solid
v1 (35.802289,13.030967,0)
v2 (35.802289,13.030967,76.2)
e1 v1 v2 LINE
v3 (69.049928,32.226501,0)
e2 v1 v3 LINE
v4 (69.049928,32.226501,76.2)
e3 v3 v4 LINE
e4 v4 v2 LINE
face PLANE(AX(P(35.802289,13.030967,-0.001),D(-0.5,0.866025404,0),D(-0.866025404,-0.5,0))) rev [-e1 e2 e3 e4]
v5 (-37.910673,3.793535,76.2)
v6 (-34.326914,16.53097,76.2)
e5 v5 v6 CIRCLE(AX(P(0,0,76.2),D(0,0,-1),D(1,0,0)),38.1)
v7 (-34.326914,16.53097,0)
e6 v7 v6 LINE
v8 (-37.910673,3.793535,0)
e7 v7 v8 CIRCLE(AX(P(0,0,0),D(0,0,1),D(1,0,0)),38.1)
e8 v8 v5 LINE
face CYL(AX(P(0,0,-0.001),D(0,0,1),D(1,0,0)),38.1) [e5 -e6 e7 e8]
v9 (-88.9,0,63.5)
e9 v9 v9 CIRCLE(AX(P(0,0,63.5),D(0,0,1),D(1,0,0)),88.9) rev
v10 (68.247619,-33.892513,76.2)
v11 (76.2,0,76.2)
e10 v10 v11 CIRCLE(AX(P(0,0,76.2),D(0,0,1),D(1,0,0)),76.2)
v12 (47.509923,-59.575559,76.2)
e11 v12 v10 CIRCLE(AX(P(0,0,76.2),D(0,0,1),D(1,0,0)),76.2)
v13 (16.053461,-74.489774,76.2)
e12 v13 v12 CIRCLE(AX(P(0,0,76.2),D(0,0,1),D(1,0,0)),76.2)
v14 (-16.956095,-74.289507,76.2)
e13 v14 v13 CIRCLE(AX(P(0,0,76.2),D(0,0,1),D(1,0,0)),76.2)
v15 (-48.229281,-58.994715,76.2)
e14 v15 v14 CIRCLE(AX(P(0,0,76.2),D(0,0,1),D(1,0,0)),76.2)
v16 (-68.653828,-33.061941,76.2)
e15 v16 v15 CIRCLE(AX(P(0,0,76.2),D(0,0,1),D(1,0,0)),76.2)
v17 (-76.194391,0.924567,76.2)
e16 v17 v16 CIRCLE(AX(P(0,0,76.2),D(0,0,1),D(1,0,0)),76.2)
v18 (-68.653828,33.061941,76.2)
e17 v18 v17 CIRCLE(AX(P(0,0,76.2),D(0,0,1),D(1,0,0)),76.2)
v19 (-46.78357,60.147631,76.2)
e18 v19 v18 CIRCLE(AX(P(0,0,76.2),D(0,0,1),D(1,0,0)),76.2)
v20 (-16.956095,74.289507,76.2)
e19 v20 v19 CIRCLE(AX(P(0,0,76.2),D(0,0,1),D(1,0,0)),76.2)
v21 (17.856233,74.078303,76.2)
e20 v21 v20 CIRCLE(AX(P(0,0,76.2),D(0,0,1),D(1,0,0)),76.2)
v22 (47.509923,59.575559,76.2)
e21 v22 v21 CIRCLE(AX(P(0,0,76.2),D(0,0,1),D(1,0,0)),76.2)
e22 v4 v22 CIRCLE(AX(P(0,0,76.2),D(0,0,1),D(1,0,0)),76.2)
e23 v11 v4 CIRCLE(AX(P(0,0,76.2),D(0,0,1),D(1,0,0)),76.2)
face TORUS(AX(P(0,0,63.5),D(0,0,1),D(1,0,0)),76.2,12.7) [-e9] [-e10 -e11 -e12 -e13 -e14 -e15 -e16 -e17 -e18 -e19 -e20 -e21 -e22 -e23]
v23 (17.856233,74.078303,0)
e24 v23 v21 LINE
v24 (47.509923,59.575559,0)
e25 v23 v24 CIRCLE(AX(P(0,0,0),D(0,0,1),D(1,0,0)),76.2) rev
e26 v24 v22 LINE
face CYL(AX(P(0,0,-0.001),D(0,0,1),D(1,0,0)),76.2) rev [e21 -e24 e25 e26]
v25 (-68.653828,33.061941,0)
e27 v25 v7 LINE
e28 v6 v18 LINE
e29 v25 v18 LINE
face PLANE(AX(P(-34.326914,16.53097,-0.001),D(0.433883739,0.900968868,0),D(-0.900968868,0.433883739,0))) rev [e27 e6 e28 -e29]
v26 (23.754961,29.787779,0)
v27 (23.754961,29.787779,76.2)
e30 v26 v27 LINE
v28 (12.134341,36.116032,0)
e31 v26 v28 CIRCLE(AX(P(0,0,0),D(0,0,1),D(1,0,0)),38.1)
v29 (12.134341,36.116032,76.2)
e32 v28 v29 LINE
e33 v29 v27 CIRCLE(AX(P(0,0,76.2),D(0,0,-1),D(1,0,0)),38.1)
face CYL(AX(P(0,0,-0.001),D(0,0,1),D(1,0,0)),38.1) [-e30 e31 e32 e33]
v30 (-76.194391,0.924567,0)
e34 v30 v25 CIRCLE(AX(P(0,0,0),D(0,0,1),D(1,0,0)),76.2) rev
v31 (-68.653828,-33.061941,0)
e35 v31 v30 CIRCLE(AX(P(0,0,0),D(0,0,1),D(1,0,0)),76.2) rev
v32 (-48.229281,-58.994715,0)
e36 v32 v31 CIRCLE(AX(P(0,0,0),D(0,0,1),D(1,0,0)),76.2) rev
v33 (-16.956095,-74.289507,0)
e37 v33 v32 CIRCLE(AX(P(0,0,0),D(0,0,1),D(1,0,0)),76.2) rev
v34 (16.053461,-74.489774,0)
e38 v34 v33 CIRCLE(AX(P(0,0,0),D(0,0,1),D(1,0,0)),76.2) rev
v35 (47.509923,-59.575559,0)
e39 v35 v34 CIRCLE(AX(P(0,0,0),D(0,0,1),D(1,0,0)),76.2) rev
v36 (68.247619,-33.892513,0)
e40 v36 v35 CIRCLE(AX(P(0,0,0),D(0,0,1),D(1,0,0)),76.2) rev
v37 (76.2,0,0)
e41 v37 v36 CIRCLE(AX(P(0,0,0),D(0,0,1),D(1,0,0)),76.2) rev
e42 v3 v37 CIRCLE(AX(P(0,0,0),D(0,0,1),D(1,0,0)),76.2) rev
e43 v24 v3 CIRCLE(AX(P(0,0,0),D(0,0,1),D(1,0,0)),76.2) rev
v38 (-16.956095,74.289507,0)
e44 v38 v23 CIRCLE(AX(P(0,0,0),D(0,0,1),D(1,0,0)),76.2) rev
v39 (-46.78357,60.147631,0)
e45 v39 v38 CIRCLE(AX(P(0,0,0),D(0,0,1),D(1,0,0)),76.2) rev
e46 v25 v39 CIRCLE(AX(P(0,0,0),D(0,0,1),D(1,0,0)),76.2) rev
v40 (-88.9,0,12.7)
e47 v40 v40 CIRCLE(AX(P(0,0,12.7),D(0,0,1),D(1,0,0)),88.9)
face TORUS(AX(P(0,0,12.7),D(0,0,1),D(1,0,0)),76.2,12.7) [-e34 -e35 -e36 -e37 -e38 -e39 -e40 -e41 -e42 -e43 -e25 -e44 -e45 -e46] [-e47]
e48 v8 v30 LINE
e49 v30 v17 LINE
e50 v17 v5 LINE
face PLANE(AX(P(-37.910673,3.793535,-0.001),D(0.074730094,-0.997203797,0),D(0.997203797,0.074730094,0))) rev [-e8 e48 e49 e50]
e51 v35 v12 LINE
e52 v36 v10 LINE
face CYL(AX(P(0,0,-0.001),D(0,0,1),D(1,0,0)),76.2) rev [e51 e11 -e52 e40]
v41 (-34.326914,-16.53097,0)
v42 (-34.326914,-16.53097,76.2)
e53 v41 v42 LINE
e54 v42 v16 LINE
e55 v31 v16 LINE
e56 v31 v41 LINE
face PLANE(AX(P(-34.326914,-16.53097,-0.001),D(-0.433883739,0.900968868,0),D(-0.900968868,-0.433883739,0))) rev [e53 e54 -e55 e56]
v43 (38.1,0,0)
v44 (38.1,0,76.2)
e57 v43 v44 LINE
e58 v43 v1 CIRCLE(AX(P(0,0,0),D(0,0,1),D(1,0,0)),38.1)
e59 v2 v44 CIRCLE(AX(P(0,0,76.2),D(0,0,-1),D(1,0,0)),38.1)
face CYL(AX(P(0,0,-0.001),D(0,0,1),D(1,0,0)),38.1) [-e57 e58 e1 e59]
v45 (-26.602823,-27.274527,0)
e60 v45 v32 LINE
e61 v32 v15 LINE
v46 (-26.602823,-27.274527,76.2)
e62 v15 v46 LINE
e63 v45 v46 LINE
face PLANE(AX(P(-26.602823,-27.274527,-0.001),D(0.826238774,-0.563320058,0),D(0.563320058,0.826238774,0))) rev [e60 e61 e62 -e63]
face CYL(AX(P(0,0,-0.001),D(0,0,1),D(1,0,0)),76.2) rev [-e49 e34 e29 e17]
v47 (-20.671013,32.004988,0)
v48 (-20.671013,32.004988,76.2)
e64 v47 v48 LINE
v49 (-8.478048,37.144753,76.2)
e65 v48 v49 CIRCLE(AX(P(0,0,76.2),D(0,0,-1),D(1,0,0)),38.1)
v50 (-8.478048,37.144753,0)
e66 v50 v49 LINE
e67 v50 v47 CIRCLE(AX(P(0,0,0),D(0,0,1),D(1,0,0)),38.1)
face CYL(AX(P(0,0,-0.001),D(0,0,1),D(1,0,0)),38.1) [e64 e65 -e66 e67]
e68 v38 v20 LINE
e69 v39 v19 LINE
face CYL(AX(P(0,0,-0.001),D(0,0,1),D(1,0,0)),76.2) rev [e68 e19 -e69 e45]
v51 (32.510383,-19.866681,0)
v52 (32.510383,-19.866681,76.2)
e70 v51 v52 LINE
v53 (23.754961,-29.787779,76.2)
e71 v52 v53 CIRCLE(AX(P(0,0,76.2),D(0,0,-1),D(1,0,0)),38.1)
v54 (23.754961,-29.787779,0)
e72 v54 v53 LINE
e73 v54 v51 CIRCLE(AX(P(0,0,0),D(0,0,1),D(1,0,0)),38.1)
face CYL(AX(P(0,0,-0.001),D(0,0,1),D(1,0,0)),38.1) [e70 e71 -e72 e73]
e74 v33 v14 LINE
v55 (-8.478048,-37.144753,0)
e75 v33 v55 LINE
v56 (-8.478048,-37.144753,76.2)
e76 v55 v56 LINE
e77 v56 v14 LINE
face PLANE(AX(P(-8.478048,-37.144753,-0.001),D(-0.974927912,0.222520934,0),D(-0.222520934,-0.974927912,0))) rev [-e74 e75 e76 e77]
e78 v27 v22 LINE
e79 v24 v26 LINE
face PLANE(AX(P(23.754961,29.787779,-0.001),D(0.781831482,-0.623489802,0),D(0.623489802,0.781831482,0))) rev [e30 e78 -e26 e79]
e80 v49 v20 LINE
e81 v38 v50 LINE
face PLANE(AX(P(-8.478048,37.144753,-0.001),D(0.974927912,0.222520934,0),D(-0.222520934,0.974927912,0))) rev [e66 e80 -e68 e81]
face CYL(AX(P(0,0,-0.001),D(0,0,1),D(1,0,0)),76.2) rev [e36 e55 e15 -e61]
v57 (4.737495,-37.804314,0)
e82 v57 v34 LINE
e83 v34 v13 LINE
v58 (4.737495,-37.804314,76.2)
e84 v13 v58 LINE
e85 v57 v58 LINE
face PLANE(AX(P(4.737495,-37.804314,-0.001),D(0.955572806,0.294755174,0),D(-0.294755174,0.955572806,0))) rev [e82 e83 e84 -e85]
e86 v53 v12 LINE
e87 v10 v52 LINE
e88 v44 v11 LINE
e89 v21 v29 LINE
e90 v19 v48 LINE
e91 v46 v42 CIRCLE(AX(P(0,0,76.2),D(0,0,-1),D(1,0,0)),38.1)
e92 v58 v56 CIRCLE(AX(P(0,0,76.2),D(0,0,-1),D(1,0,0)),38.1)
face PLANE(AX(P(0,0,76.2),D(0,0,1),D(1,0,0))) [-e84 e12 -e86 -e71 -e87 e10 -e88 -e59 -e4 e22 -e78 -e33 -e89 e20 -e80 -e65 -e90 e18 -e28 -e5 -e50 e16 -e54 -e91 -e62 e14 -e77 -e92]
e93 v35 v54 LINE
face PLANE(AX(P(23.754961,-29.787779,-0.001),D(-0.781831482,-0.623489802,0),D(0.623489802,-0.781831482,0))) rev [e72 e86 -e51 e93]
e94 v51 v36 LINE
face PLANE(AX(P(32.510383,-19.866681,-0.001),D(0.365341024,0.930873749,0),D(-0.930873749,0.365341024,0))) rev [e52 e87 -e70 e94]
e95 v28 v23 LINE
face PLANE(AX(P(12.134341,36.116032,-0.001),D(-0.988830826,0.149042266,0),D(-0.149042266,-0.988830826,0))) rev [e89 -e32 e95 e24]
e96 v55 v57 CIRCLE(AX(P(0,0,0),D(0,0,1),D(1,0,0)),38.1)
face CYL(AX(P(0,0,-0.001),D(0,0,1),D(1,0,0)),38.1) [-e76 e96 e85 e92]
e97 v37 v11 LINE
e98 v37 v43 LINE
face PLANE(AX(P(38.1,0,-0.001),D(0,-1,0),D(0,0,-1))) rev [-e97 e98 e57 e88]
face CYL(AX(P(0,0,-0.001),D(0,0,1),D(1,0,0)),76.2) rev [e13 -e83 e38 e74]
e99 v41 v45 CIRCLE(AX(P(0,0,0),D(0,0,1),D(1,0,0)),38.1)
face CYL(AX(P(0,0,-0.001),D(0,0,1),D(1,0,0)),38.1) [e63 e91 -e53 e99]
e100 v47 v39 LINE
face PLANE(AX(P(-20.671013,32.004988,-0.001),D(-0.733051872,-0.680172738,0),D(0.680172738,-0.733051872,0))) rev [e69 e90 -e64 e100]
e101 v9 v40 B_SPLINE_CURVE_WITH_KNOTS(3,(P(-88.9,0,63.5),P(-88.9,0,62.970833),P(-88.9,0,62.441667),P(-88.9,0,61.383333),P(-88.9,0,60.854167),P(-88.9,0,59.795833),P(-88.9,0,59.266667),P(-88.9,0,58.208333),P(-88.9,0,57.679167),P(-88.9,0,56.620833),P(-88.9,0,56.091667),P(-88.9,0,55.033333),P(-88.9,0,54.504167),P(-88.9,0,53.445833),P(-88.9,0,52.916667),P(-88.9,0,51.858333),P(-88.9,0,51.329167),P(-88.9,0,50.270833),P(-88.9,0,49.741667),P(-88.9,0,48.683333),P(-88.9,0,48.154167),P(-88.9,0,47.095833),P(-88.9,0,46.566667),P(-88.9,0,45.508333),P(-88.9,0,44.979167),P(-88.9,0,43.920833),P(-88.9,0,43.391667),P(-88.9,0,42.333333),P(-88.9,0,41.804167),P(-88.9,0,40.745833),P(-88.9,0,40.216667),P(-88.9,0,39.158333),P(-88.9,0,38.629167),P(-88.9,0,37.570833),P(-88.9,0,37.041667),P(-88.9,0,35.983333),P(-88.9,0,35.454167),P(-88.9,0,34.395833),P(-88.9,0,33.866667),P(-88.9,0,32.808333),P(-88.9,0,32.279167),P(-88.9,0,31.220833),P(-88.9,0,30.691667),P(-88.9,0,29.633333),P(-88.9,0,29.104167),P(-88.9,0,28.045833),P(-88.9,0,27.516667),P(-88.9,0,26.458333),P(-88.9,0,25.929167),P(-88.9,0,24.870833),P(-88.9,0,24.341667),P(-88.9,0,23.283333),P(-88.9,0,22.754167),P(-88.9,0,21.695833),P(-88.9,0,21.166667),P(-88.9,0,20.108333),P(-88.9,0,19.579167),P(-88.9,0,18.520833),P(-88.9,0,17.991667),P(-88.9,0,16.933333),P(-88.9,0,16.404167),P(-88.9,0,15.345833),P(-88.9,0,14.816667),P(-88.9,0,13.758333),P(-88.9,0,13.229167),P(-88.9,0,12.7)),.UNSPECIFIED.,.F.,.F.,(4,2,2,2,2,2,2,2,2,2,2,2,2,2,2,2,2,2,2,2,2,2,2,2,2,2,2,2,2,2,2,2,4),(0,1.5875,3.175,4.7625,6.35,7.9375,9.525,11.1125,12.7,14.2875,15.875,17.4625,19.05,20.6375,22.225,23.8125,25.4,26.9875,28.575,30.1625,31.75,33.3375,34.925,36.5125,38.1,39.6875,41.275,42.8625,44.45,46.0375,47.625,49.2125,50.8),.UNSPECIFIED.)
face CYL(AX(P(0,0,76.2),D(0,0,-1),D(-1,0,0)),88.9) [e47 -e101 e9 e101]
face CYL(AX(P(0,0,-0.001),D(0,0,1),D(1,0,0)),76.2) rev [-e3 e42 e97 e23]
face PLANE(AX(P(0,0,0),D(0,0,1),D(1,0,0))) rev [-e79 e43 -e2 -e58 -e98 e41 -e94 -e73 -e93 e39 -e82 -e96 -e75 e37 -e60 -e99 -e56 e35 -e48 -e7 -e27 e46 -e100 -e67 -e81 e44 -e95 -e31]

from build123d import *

# Parameters (mm, degrees)
SKETCH1_R           = 88.9
BOSS_EXTRUDE1_DEPTH = 76.2
CUT_EXTRUDE1_REACH  = 149.013


with BuildPart() as part:
    # Sketch1 → Boss-Extrude1 (new body)
    with BuildSketch(Plane.XY):
        with Locations(Location((0, 0, 0), (0, 0, 180))):
            Circle(SKETCH1_R)
    extrude(amount=BOSS_EXTRUDE1_DEPTH)

    # Sketch3 → Cut-Extrude1 (cut, up to next)
    with BuildSketch(Plane.XY.offset(76.2), mode=Mode.PRIVATE) as cut_extrude1_sk1:
        with BuildLine():
            Line((35.802288852, 13.030967461), (69.049928483, 32.226501152))
            ThreePointArc((69.049928483, 32.226501152), (74.391009371, 16.505081787), (76.2, 0))
            Line((76.2, 0), (38.1, 0))
            ThreePointArc((38.1, 0), (37.52117539, 6.615995569), (35.802288852, 13.030967461))
        make_face()
    cut_extrude1_tool1 = extrude(cut_extrude1_sk1.sketch, amount=-CUT_EXTRUDE1_REACH, mode=Mode.PRIVATE) & part.part
    # Sketch3 → Cut-Extrude1 (cut, up to next)
    with BuildSketch(Plane.XY.offset(76.2), mode=Mode.PRIVATE) as cut_extrude1_sk2:
        with BuildLine():
            Line((32.51038259, -19.866681249), (68.247619398, -33.892513133))
            ThreePointArc((68.247619398, -33.892513133), (59.286228254, -47.870482966), (47.509922902, -59.575558964))
            Line((47.509922902, -59.575558964), (23.754961451, -29.787779482))
            ThreePointArc((23.754961451, -29.787779482), (28.566663833, -25.210230412), (32.51038259, -19.866681249))
        make_face()
    cut_extrude1_tool2 = extrude(cut_extrude1_sk2.sketch, amount=-CUT_EXTRUDE1_REACH, mode=Mode.PRIVATE) & part.part
    # Sketch3 → Cut-Extrude1 (cut, up to next)
    with BuildSketch(Plane.XY.offset(76.2), mode=Mode.PRIVATE) as cut_extrude1_sk3:
        with BuildLine():
            Line((4.737495147, -37.804313771), (16.053460909, -74.489773747))
            ThreePointArc((16.053460909, -74.489773747), (-0.462291956, -76.198597665), (-16.956095167, -74.289506908))
            Line((-16.956095167, -74.289506908), (-8.478047584, -37.144753454))
            ThreePointArc((-8.478047584, -37.144753454), (-1.899128244, -38.052638698), (4.737495147, -37.804313771))
        make_face()
    cut_extrude1_tool3 = extrude(cut_extrude1_sk3.sketch, amount=-CUT_EXTRUDE1_REACH, mode=Mode.PRIVATE) & part.part
    # Sketch3 → Cut-Extrude1 (cut, up to next)
    with BuildSketch(Plane.XY.offset(76.2), mode=Mode.PRIVATE) as cut_extrude1_sk4:
        with BuildLine():
            Line((-26.602822769, -27.274526957), (-48.229281076, -58.994715415))
            ThreePointArc((-48.229281076, -58.994715415), (-59.862696895, -47.147614155), (-68.653827734, -33.061940921))
            Line((-68.653827734, -33.061940921), (-34.326913867, -16.53097046))
            ThreePointArc((-34.326913867, -16.53097046), (-30.934838018, -22.240633912), (-26.602822769, -27.274526957))
        make_face()
    cut_extrude1_tool4 = extrude(cut_extrude1_sk4.sketch, amount=-CUT_EXTRUDE1_REACH, mode=Mode.PRIVATE) & part.part
    # Sketch3 → Cut-Extrude1 (cut, up to next)
    with BuildSketch(Plane.XY.offset(76.2), mode=Mode.PRIVATE) as cut_extrude1_sk5:
        with BuildLine():
            Line((-37.910672541, 3.793534955), (-76.194390713, 0.924566897))
            ThreePointArc((-76.194390713, 0.924566897), (-74.185270095, 17.40648445), (-68.653827734, 33.061940921))
            Line((-68.653827734, 33.061940921), (-34.326913867, 16.53097046))
            ThreePointArc((-34.326913867, 16.53097046), (-36.675983809, 10.319021836), (-37.910672541, 3.793534955))
        make_face()
    cut_extrude1_tool5 = extrude(cut_extrude1_sk5.sketch, amount=-CUT_EXTRUDE1_REACH, mode=Mode.PRIVATE) & part.part
    # Sketch3 → Cut-Extrude1 (cut, up to next)
    with BuildSketch(Plane.XY.offset(76.2), mode=Mode.PRIVATE) as cut_extrude1_sk6:
        with BuildLine():
            Line((-20.671012653, 32.004987672), (-46.78357006, 60.147631478))
            ThreePointArc((-46.78357006, 60.147631478), (-32.64482181, 68.853145237), (-16.956095167, 74.289506908))
            Line((-16.956095167, 74.289506908), (-8.478047584, 37.144753454))
            ThreePointArc((-8.478047584, 37.144753454), (-14.799365738, 35.108243672), (-20.671012653, 32.004987672))
        make_face()
    cut_extrude1_tool6 = extrude(cut_extrude1_sk6.sketch, amount=-CUT_EXTRUDE1_REACH, mode=Mode.PRIVATE) & part.part
    # Sketch3 → Cut-Extrude1 (cut, up to next)
    with BuildSketch(Plane.XY.offset(76.2), mode=Mode.PRIVATE) as cut_extrude1_sk7:
        with BuildLine():
            Line((12.134341375, 36.116031889), (17.856233058, 74.078302768))
            ThreePointArc((17.856233058, 74.078302768), (33.477843131, 68.451983312), (47.509922902, 59.575558964))
            Line((47.509922902, 59.575558964), (23.754961451, 29.787779482))
            ThreePointArc((23.754961451, 29.787779482), (18.221476585, 33.460241945), (12.134341375, 36.116031889))
        make_face()
    cut_extrude1_tool7 = extrude(cut_extrude1_sk7.sketch, amount=-CUT_EXTRUDE1_REACH, mode=Mode.PRIVATE) & part.part
    add(cut_extrude1_tool1.solids().sort_by_distance((58.182027, 12.183187, 76.2))[0], mode=Mode.SUBTRACT)
    add(cut_extrude1_tool2.solids().sort_by_distance((45.8011, -37.892448, 76.2))[0], mode=Mode.SUBTRACT)
    add(cut_extrude1_tool3.solids().sort_by_distance((-1.06899, -59.434296, 76.2))[0], mode=Mode.SUBTRACT)
    add(cut_extrude1_tool4.solids().sort_by_distance((-47.134109, -36.220908, 76.2))[0], mode=Mode.SUBTRACT)
    add(cut_extrude1_tool5.solids().sort_by_distance((-57.706282, 14.267563, 76.2))[0], mode=Mode.SUBTRACT)
    add(cut_extrude1_tool6.solids().sort_by_distance((-24.824448, 54.012268, 76.2))[0], mode=Mode.SUBTRACT)
    add(cut_extrude1_tool7.solids().sort_by_distance((26.750702, 53.084633, 76.2))[0], mode=Mode.SUBTRACT)

    # Fillet2: read off the stored shape, not the designer's step
    # Fillet2 outline → Fillet2 (revolve, cut)
    with BuildSketch(Plane.XZ):
        with BuildLine():
            ThreePointArc((76.2, 76.2), (85.180256121, 72.480256121), (88.9, 63.5))
            Line((88.9, 63.5), (88.9, 76.2))
            Line((88.9, 76.2), (76.2, 76.2))
        make_face()
        with BuildLine():
            Line((88.9, 0), (88.9, 12.7))
            ThreePointArc((88.9, 12.7), (85.180256121, 3.719743879), (76.2, 0))
            Line((76.2, 0), (88.9, 0))
        make_face()
    revolve(axis=Axis((0, 0, 0), (0, 0, 1)), mode=Mode.SUBTRACT)


solid = part.part
